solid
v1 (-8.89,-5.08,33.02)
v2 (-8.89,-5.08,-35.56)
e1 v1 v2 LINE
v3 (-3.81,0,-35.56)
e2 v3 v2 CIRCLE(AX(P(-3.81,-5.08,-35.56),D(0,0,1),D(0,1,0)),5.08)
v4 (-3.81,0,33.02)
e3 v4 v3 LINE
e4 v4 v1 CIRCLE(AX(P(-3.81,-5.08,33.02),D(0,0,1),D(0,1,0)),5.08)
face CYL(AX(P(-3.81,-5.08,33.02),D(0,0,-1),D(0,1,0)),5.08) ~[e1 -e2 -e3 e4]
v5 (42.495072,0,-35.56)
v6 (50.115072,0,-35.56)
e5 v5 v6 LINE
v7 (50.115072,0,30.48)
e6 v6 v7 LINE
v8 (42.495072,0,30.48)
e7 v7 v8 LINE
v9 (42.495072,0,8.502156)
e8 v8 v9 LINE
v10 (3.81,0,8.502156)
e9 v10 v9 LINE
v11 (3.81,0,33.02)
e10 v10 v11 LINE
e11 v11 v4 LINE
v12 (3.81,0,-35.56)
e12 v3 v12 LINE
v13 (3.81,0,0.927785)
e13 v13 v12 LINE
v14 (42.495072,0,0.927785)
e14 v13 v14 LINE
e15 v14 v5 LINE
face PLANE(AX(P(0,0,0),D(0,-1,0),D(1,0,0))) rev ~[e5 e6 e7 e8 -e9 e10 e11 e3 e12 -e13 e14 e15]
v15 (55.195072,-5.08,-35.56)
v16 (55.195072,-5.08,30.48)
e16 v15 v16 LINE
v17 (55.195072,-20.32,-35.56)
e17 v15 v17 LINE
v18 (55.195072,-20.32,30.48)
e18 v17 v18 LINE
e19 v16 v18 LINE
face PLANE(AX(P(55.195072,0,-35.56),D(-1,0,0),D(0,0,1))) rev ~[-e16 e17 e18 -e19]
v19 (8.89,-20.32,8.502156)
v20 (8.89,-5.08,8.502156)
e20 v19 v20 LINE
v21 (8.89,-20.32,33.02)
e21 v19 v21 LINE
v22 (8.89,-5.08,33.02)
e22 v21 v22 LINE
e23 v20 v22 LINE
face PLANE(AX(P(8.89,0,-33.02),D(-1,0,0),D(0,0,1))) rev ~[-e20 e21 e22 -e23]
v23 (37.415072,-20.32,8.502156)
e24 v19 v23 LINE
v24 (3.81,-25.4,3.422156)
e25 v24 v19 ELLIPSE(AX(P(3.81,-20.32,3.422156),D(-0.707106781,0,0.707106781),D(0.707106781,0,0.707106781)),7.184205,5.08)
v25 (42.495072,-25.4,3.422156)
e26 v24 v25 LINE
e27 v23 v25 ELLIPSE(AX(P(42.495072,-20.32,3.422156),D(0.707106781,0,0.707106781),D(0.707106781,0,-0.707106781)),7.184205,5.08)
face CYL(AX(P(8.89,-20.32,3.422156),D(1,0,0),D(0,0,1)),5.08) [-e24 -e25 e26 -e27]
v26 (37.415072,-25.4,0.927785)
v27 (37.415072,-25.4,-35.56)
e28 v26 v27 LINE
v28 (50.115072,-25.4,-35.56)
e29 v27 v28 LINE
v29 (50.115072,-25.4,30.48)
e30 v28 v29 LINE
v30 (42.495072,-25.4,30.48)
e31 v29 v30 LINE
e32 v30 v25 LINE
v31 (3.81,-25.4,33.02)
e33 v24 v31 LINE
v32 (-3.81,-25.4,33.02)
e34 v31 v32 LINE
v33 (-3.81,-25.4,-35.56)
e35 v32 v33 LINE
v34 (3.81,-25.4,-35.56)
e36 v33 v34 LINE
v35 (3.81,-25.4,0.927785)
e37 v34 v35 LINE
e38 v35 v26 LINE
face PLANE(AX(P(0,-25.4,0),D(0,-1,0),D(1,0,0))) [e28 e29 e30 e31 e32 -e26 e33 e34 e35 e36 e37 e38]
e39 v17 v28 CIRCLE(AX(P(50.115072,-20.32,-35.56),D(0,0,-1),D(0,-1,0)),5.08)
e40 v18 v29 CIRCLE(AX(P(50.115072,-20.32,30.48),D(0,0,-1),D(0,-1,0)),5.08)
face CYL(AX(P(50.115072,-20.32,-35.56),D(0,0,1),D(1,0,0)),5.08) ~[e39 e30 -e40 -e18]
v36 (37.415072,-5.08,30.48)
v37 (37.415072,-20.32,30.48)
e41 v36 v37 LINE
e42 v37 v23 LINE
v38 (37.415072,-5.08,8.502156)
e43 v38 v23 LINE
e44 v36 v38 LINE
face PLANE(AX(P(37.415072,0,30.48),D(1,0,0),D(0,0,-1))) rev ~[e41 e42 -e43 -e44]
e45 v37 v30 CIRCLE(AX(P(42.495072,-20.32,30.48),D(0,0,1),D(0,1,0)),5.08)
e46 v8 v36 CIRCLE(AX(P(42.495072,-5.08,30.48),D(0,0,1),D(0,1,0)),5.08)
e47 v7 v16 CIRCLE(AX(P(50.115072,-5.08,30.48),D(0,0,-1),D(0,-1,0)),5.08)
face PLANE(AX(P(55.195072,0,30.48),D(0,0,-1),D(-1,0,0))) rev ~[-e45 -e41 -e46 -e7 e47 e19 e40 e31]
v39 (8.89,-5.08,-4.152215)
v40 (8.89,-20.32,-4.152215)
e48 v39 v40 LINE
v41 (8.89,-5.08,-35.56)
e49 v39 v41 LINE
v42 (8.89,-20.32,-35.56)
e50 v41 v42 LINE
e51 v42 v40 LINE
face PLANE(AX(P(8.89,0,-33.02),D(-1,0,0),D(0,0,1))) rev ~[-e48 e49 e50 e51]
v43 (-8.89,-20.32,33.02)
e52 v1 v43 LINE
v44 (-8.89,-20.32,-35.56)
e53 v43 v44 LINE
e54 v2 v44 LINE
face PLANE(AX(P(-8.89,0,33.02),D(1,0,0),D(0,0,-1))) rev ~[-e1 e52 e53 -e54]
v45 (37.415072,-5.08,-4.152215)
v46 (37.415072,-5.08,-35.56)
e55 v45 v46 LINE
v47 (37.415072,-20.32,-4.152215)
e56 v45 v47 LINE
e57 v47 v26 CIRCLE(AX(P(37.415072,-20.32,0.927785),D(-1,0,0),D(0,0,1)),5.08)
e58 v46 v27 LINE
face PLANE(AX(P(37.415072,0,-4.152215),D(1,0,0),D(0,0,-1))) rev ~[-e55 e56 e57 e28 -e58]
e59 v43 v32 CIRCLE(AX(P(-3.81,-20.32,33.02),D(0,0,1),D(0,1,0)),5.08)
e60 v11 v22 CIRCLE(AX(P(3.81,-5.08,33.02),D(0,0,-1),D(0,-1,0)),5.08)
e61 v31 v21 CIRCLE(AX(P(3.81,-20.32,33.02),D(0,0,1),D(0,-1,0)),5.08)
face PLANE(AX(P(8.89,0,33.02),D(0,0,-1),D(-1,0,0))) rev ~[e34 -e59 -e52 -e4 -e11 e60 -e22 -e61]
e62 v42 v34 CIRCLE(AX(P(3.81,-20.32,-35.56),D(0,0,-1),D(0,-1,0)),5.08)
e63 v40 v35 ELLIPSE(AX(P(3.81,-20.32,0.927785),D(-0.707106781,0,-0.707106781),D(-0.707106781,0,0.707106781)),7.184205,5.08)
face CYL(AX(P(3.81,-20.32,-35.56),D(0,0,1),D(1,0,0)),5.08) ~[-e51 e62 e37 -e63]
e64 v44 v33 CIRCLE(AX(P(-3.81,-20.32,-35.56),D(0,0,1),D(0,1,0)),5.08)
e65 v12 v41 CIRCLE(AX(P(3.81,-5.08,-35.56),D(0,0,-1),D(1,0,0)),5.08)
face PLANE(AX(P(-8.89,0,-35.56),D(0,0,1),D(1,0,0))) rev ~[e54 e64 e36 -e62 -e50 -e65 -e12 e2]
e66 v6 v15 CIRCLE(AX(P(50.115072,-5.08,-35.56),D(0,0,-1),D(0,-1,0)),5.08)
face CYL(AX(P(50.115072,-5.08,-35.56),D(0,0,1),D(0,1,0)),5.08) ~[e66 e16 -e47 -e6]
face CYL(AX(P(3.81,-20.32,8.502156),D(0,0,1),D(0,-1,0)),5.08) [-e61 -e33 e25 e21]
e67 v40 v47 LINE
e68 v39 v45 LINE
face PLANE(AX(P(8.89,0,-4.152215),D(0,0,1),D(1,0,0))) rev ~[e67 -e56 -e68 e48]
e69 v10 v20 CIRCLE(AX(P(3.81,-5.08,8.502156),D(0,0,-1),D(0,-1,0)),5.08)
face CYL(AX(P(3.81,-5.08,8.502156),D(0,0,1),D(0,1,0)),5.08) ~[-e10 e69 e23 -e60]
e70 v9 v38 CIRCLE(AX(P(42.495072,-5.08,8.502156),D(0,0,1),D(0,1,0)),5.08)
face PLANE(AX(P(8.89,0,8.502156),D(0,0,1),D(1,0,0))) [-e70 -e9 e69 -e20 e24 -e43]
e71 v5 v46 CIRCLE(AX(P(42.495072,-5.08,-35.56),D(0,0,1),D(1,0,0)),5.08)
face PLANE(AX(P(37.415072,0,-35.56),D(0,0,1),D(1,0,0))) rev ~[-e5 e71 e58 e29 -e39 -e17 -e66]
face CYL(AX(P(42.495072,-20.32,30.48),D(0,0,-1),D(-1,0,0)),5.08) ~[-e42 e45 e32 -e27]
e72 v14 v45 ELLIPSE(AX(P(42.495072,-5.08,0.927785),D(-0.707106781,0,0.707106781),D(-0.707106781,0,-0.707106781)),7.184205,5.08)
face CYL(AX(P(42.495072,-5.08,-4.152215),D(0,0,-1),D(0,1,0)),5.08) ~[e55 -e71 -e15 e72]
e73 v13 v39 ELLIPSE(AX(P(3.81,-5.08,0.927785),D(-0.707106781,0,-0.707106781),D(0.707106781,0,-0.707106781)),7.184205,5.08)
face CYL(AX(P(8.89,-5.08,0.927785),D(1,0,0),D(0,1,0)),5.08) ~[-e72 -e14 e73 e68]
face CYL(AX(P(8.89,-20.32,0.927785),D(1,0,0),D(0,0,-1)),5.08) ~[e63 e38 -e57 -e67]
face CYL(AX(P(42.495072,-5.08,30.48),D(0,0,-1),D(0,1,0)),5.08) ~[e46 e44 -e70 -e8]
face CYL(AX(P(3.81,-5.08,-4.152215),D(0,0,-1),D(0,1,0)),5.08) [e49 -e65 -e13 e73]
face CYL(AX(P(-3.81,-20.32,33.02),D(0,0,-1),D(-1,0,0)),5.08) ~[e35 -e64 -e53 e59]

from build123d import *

# Parameters (mm, degrees)
F1_DEPTH = 12.7
F0_W     = 17.78
F0_H     = 2.54
F0_W_2   = 28.5250723219
F0_H_2   = 12.6543707534
F0_H_3   = 4.4012725921
F2_DEPTH = 25.4
F3_R     = 5.08


with BuildPart() as f1:
    # F0 (on Front) → F1 (new body)
    with BuildSketch(Plane.XZ):
        Polygon((8.89, 33.02), (-8.89, 33.02), (-8.89, -33.02), (8.89, -33.02), (8.89, -4.1522149311), (8.89, 8.5021558223), align=None)
    extrude(amount=F1_DEPTH)

    # F0 (on Front) → F2 (join)
    with BuildSketch(Plane.XZ):
        Polygon((8.89, 33.02), (-8.89, 33.02), (-8.89, -33.02), (8.89, -33.02), (8.89, -4.1522149311), (8.89, 8.5021558223), align=None)
        with Locations((0, -34.29)):
            Rectangle(F0_W, F0_H)
        with Locations((23.1525361609, 2.1749704456)):
            Rectangle(F0_W_2, F0_H_2)
        Polygon((37.4150723219, 30.48), (37.4150723219, 8.5021558223), (37.4150723219, -4.1522149311), (37.4150723219, -31.1587274079), (55.1950723219, -31.1587274079), (55.1950723219, 30.48), align=None)
        with Locations((46.3050723219, -33.359363704)):
            Rectangle(F0_W, F0_H_3)
    extrude(amount=F2_DEPTH)

    # F3
    f3_edges = [f1.edges().sort_by_distance(p)[0] for p in [
        (55.195072, -25.4, -2.54),
        (55.195072, 0, -2.54),
        (37.415072, -25.4, 19.491078),
        (8.89, -25.4, 20.761078),
        (8.89, -25.4, -19.856107),
        (-8.89, -25.4, -1.27),
        (23.152536, -25.4, 8.502156),
        (23.152536, -25.4, -4.152215),
        (37.415072, 0, -19.856107),
        (37.415072, 0, 19.491078),
        (23.152536, 0, -4.152215),
        (8.89, 0, 20.761078),
        (8.89, 0, -19.856107),
        (-8.89, 0, -1.27),
    ]]
    fillet(f3_edges, radius=F3_R)


solid = f1.part
